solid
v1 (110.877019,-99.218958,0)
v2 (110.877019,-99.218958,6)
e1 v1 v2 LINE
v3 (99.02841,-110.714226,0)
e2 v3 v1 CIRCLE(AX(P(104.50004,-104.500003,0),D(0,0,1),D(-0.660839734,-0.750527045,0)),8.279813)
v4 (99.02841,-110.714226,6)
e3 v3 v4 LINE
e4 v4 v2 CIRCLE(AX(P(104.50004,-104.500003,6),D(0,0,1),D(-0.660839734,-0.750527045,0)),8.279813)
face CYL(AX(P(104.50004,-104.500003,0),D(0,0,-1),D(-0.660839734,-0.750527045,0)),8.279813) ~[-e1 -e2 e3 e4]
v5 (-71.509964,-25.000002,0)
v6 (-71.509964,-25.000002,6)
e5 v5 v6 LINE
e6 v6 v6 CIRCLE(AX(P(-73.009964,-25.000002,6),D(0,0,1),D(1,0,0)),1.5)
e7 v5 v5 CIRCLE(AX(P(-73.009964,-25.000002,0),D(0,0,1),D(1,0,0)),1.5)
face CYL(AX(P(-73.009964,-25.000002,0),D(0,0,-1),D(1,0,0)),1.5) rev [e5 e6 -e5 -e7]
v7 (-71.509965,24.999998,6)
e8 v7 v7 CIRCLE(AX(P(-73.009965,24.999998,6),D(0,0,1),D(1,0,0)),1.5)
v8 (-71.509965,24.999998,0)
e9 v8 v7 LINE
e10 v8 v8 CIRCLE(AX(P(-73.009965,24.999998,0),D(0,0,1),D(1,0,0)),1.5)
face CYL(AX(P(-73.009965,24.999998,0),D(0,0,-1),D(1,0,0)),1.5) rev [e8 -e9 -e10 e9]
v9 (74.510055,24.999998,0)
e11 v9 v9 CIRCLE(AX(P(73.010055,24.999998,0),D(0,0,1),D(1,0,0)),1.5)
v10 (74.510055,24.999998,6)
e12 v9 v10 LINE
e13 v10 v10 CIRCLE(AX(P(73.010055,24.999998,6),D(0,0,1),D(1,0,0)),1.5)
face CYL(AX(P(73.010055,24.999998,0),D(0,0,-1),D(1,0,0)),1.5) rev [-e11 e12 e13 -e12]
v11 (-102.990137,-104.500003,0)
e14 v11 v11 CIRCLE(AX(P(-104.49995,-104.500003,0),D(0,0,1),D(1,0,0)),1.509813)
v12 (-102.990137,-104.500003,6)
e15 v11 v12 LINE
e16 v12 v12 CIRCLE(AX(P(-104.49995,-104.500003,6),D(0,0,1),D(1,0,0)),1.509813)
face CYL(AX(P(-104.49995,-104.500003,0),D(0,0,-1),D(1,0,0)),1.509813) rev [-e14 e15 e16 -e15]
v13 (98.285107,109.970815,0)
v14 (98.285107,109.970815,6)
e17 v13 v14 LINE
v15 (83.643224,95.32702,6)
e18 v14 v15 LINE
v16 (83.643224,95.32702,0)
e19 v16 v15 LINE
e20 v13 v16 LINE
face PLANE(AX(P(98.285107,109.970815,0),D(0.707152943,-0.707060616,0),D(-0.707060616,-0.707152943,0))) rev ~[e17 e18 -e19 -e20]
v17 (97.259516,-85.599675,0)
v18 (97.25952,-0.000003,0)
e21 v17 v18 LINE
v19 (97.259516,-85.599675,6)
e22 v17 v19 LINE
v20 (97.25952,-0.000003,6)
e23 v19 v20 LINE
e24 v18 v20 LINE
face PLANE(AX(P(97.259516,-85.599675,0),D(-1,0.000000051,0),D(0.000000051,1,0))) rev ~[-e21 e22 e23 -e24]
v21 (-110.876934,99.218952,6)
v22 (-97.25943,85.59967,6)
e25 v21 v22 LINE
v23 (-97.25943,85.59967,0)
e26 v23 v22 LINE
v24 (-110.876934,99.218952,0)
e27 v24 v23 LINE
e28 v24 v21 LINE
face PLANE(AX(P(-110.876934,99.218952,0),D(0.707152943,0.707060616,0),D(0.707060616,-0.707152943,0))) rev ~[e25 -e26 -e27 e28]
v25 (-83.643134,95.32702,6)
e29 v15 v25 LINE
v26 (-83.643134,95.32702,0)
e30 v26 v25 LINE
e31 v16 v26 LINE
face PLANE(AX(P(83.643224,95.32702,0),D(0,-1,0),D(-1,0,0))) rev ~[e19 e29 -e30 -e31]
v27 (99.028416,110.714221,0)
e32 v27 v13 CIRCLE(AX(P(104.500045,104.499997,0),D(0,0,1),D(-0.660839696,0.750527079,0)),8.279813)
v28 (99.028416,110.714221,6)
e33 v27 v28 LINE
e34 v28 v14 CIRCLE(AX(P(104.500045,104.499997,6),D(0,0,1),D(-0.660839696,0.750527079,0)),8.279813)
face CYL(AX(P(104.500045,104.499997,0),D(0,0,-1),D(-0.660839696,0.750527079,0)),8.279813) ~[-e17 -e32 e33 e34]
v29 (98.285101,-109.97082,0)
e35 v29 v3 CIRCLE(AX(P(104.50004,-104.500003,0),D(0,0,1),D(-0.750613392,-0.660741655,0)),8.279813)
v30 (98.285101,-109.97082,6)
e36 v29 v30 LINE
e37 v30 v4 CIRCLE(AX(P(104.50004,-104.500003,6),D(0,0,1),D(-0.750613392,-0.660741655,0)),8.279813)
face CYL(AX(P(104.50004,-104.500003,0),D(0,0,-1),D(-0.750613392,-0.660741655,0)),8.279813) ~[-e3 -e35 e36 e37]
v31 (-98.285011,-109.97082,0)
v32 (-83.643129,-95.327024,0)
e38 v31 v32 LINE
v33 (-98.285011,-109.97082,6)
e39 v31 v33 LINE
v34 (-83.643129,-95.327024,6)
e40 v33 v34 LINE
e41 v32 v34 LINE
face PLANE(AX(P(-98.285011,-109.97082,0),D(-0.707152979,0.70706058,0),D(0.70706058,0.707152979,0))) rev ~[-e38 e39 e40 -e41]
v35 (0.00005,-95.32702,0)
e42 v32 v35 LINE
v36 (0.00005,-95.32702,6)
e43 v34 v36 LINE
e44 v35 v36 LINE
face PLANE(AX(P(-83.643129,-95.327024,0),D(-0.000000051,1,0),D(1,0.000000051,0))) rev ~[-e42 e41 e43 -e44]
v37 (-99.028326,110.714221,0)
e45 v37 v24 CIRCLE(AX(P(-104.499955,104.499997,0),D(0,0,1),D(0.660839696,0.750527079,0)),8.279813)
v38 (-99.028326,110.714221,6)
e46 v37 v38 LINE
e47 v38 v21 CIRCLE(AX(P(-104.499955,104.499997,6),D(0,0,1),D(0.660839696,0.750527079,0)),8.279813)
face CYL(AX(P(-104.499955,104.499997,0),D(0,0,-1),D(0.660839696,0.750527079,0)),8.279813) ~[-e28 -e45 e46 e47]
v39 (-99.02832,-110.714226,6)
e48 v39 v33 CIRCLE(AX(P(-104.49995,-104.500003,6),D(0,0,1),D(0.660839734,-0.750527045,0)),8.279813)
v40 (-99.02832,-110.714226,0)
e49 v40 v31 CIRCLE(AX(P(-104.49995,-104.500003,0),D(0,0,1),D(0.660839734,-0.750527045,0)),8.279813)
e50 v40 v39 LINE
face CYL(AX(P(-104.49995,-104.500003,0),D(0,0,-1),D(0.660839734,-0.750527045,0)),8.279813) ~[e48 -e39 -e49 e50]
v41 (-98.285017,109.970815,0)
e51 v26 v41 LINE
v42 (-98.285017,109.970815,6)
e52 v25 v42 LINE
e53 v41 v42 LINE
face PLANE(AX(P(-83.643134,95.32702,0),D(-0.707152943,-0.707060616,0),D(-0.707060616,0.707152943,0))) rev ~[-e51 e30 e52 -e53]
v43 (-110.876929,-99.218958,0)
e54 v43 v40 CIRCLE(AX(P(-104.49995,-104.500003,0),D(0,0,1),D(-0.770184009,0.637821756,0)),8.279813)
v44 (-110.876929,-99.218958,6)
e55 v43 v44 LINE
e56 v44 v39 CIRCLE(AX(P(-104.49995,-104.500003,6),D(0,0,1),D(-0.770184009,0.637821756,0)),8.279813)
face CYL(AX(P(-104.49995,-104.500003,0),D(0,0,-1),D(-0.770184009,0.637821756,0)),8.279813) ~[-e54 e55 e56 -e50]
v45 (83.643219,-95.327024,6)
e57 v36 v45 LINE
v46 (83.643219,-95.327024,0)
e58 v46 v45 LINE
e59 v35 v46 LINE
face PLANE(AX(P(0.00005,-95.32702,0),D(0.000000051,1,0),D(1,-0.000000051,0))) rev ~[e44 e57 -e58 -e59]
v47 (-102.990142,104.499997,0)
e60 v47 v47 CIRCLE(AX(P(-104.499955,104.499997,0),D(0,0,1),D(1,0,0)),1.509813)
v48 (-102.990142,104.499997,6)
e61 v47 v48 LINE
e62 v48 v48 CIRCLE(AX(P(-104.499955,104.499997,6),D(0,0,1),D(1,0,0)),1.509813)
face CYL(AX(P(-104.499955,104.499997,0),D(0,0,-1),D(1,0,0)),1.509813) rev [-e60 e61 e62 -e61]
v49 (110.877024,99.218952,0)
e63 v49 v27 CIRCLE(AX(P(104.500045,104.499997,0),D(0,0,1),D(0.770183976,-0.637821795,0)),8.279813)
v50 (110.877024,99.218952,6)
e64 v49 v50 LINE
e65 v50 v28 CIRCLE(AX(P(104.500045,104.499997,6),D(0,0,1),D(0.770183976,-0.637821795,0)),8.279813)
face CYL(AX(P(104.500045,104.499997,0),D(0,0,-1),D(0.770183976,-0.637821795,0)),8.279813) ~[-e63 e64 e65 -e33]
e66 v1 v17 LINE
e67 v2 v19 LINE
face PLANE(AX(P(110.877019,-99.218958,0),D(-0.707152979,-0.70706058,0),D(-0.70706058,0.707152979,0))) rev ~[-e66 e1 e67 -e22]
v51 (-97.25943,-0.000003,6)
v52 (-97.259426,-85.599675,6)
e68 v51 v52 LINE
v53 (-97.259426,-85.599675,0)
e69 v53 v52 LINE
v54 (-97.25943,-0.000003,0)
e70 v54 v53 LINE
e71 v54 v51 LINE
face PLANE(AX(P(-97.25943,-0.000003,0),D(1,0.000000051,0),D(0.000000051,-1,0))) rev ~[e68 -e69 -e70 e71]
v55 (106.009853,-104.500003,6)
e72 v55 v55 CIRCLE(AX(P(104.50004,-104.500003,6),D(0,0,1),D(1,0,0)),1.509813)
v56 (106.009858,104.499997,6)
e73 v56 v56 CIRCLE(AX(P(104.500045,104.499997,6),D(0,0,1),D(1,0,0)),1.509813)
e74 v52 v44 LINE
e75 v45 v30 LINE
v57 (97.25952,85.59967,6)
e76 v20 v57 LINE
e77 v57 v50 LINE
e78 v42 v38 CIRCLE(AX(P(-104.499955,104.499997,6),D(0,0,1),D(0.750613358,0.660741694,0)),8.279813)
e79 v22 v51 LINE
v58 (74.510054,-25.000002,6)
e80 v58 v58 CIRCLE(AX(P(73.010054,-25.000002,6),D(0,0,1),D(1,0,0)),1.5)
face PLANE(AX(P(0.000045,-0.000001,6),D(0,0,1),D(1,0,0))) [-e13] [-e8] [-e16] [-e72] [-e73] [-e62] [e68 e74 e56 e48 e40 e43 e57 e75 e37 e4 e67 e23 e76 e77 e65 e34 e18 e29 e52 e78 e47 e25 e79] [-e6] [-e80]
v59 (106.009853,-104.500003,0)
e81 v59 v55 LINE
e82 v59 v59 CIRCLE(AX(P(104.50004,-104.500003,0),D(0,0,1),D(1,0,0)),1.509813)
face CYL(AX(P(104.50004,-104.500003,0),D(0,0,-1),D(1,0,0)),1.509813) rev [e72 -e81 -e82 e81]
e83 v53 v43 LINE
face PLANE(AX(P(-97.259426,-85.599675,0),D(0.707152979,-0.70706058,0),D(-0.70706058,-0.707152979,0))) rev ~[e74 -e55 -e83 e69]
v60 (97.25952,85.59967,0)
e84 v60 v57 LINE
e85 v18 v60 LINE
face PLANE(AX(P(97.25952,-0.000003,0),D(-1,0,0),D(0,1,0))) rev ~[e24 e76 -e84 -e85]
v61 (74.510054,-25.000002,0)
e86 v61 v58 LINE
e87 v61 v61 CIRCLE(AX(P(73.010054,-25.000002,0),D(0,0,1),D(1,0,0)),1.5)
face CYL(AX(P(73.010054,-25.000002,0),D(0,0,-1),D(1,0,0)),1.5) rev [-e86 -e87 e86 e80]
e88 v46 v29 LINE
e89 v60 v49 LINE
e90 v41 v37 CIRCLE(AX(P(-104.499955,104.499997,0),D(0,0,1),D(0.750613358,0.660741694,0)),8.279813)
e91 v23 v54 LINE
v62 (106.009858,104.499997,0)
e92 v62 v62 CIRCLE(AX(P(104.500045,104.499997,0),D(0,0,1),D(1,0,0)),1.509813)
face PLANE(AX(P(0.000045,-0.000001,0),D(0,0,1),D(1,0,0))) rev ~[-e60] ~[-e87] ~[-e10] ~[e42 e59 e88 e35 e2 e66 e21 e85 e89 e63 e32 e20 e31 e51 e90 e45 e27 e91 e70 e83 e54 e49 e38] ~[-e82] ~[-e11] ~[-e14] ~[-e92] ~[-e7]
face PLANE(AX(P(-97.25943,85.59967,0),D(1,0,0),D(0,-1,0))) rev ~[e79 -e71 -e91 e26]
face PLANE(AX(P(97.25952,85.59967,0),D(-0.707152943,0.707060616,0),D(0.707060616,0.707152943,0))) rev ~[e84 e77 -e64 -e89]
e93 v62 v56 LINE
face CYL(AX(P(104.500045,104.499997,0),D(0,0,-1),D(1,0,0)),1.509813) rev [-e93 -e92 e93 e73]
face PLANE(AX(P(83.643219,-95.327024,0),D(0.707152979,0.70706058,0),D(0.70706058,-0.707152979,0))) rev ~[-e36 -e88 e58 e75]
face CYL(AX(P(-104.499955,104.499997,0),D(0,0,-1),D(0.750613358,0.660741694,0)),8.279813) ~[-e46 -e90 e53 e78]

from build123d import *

# Parameters (mm, degrees)
F0_R     = 1.5098129389
F0_R_2   = 1.5
F1_DEPTH = 6


# Not quite as in the source:
# - ends of sketch curves that miss each other by under 0.0002 mm in the source are joined


with BuildPart() as f1:
    # F0 (on Top) → F1 (new body)
    with BuildSketch(Plane.XY):
        with BuildLine():
            Line((4.5e-05, 95.32702), (-83.6431340024, 95.32702))
            Line((-83.6431340024, 95.32702), (-98.2850169252, 109.9708148351))
            Line((-98.2850169252, 109.9708148351), (-99.0283260424, 110.7142210123))
            ThreePointArc((-99.0283260424, 110.7142210123), (-110.2653878227, 110.4426468905), (-110.8769341282, 99.2189522637))
            Line((-110.8769341282, 99.2189522637), (-97.25943, 85.599669985))
            Line((-97.25943, 85.599669985), (-97.25943, -2.5e-06))
            Line((-97.25943, -2.5e-06), (-97.2594255995, -85.5996749849))
            Line((-97.2594255995, -85.5996749849), (-110.8769290275, -99.2189579637))
            ThreePointArc((-110.8769290275, -99.2189579637), (-110.2653821451, -110.4426525591), (-99.0283203508, -110.7142261032))
            Line((-99.0283203508, -110.7142261032), (-98.2850112718, -109.9708198877))
            Line((-98.2850112718, -109.9708198877), (-83.6431291018, -95.3270243))
            Line((-83.6431291018, -95.3270243), (4.99006e-05, -95.32702))
            Line((4.99006e-05, -95.32702), (83.6432191018, -95.3270243))
            Line((83.6432191018, -95.3270243), (98.2851012718, -109.9708198877))
            Line((98.2851012718, -109.9708198877), (99.0284103508, -110.7142261032))
            ThreePointArc((99.0284103508, -110.7142261032), (110.2654721451, -110.4426525591), (110.8770190275, -99.2189579637))
            Line((110.8770190275, -99.2189579637), (97.2595155995, -85.5996749849))
            Line((97.2595155995, -85.5996749849), (97.25952, -2.5e-06))
            Line((97.25952, -2.5e-06), (97.25952, 85.599669985))
            Line((97.25952, 85.599669985), (110.8770241282, 99.2189522637))
            ThreePointArc((110.8770241282, 99.2189522637), (110.2654778227, 110.4426468905), (99.0284160424, 110.7142210123))
            Line((99.0284160424, 110.7142210123), (98.2851069252, 109.9708148351))
            Line((98.2851069252, 109.9708148351), (83.6432240024, 95.32702))
            Line((83.6432240024, 95.32702), (4.5e-05, 95.32702))
        make_face()
        with Locations((-104.4999496278, -104.5000026861)):
            Circle(F0_R, mode=Mode.SUBTRACT)
        with Locations((-73.0099637148, -25.0000018767)):
            Circle(F0_R_2, mode=Mode.SUBTRACT)
        with Locations((104.5000396278, -104.5000026861)):
            Circle(F0_R, mode=Mode.SUBTRACT)
        with Locations((73.0100537148, -25.0000018767)):
            Circle(F0_R_2, mode=Mode.SUBTRACT)
        with Locations((-73.009965, 24.9999981233)):
            Circle(F0_R_2, mode=Mode.SUBTRACT)
        with Locations((-104.499955, 104.4999973139)):
            Circle(F0_R, mode=Mode.SUBTRACT)
        with Locations((73.010055, 24.9999981233)):
            Circle(F0_R_2, mode=Mode.SUBTRACT)
        with Locations((104.500045, 104.4999973139)):
            Circle(F0_R, mode=Mode.SUBTRACT)
        with BuildLine():
            Line((-99.0283260424, 110.7142210123), (-98.2850169252, 109.9708148351))
            ThreePointArc((-98.2850169252, 109.9708148351), (-98.6448610267, 110.3543268389), (-99.0283260424, 110.7142210123))
        make_face()
        with BuildLine():
            ThreePointArc((99.0284160424, 110.7142210123), (98.6449510267, 110.3543268389), (98.2851069252, 109.9708148351))
            Line((98.2851069252, 109.9708148351), (99.0284160424, 110.7142210123))
        make_face()
        with BuildLine():
            Line((-98.2850112718, -109.9708198877), (-99.0283203508, -110.7142261032))
            ThreePointArc((-99.0283203508, -110.7142261032), (-98.6448553535, -110.35433191), (-98.2850112718, -109.9708198877))
        make_face()
        with BuildLine():
            ThreePointArc((98.2851012718, -109.9708198877), (98.6449453535, -110.35433191), (99.0284103508, -110.7142261032))
            Line((99.0284103508, -110.7142261032), (98.2851012718, -109.9708198877))
        make_face()
    extrude(amount=F1_DEPTH)


solid = f1.part
